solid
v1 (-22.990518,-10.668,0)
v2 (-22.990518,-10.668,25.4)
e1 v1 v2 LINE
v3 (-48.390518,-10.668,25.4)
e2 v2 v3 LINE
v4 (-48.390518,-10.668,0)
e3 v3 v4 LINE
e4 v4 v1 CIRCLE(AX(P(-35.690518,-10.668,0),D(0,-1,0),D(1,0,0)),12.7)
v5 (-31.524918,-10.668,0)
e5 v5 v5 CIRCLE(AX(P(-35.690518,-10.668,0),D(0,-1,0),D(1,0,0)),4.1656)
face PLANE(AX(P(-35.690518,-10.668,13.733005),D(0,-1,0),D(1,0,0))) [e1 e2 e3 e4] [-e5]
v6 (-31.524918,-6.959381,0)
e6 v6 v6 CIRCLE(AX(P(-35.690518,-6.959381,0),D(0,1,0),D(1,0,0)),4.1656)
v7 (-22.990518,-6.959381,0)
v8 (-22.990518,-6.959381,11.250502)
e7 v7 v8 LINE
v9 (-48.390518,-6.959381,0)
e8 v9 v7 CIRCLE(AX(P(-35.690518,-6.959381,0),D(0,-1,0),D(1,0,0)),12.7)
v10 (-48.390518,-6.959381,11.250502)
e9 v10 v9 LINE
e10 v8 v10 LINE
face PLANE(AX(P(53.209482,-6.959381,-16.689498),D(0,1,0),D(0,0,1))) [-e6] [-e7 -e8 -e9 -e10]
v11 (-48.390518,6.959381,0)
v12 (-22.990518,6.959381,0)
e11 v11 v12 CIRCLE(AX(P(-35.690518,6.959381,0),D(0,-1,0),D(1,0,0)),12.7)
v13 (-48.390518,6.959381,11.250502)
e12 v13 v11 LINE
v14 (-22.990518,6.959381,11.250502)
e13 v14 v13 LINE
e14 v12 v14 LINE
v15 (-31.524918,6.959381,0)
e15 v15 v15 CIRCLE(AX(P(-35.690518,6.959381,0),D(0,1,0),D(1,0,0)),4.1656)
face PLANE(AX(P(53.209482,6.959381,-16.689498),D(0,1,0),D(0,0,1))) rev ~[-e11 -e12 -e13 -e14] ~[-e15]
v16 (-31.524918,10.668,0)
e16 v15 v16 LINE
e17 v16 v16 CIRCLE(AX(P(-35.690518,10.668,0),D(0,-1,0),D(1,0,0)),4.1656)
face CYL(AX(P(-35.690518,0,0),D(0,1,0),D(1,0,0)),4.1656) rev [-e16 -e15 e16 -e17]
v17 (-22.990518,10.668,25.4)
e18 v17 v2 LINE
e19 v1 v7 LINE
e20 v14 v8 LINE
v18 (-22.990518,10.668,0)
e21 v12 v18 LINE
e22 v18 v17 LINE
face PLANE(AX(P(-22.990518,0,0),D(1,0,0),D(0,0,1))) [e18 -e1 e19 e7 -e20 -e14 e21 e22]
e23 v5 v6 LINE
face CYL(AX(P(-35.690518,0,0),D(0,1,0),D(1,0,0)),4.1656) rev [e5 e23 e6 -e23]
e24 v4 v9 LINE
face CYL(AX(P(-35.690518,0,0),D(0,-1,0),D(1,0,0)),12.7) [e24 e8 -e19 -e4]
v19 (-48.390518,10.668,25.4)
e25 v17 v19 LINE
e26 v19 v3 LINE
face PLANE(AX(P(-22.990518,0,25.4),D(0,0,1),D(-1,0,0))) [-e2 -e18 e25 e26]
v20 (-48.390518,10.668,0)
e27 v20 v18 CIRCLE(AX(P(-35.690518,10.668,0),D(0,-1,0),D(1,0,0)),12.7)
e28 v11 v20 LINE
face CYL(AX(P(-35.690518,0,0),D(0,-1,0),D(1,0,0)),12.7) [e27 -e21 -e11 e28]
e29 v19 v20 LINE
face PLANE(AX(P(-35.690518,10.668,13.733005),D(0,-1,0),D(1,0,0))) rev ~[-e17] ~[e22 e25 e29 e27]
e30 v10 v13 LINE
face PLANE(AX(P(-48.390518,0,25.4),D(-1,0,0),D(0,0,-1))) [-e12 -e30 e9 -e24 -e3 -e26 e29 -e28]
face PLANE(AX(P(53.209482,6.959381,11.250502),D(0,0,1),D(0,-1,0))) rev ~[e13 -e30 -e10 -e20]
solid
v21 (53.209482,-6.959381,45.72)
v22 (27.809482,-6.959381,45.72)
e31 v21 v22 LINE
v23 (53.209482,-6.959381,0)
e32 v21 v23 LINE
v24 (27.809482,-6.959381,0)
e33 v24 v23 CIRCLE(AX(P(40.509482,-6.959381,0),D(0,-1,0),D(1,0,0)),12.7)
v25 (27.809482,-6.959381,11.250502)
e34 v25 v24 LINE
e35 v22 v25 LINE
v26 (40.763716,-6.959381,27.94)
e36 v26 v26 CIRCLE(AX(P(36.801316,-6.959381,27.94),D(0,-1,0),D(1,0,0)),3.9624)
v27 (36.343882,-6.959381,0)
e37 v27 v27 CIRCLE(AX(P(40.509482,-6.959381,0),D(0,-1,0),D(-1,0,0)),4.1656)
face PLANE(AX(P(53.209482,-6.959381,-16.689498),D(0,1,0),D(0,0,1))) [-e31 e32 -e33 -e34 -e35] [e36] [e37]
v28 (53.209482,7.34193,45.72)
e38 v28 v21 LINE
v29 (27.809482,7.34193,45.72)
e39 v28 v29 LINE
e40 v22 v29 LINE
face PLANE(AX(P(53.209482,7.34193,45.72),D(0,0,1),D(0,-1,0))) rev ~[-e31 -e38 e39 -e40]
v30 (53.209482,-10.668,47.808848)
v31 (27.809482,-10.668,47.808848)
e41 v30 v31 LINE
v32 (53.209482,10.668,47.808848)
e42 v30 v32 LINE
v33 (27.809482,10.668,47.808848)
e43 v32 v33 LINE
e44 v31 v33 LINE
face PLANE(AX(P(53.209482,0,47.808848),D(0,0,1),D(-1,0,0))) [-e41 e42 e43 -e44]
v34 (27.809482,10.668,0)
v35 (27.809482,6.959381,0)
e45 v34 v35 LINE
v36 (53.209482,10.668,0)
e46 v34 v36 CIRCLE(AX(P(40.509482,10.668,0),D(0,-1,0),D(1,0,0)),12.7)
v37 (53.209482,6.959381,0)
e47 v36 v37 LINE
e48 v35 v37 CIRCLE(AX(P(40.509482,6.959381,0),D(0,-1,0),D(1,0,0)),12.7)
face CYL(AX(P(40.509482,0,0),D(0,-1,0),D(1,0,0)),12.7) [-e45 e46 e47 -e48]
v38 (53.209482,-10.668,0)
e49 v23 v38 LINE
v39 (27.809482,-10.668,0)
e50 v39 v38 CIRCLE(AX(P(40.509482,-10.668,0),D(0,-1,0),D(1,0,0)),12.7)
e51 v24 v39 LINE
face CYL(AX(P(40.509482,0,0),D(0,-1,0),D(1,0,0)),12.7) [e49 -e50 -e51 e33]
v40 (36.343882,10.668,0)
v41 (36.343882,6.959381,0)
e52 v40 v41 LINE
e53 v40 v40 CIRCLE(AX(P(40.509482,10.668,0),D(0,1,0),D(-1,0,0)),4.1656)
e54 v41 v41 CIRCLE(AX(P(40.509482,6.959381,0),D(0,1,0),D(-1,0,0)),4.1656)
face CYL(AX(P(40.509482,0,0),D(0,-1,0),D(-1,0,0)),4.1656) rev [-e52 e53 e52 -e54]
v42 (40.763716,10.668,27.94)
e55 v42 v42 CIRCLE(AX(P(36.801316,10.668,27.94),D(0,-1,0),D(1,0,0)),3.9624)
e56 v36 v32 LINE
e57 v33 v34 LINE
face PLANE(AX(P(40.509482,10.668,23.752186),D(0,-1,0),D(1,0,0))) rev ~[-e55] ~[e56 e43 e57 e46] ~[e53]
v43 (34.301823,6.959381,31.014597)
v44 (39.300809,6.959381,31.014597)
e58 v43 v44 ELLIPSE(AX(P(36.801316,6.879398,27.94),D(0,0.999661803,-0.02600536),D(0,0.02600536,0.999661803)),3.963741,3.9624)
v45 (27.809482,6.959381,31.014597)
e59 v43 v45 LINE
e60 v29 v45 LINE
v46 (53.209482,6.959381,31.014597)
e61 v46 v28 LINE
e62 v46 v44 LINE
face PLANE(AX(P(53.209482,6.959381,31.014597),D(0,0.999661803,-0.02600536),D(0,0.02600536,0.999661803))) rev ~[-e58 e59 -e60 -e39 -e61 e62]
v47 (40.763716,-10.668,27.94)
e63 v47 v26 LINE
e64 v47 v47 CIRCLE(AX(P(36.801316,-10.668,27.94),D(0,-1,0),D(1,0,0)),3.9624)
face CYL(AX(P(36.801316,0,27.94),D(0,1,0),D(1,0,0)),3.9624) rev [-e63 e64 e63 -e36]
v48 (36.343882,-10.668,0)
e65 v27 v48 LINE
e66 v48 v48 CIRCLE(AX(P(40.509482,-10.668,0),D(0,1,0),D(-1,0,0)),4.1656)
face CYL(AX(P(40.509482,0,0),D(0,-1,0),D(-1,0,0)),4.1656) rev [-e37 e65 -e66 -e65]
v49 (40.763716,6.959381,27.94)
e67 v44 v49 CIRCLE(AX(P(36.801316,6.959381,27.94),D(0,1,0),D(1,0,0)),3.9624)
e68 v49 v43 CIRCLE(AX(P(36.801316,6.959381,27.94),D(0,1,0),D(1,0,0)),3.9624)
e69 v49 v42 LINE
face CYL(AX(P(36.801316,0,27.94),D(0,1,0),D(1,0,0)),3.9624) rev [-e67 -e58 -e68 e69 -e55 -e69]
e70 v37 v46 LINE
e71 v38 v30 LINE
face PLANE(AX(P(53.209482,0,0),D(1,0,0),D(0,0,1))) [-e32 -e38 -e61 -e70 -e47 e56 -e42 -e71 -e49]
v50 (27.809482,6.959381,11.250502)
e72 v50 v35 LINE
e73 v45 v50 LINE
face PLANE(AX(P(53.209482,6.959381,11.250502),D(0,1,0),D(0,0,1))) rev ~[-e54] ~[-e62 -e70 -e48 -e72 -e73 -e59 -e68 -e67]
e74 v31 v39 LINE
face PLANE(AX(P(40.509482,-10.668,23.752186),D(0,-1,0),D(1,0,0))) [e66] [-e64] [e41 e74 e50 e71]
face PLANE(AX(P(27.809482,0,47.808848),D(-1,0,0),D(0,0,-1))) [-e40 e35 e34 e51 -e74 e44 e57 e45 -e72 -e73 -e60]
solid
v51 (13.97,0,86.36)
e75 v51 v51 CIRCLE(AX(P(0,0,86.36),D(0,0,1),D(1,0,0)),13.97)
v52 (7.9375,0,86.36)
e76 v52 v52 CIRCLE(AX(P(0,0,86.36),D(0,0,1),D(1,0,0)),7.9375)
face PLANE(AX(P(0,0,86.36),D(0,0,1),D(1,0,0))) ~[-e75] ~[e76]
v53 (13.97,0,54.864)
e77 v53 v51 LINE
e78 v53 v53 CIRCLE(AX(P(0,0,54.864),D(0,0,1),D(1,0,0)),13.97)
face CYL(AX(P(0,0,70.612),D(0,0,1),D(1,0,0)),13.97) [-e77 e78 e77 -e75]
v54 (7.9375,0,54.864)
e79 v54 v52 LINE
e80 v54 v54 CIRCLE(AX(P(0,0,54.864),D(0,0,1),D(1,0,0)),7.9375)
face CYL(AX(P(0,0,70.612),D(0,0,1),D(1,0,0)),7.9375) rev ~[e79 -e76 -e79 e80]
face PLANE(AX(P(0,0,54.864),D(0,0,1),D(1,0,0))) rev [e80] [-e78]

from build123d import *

# Parameters (mm, degrees)
F0_W     = 6.0325
F0_H     = 31.496
F0_R     = 4.1656
F2_DEPTH = 10.668
F0_R_2   = 3.9624
F3_W     = 13.9187620953
F3_H     = 16.6894979775
F4_DEPTH = 101.601
F5_DEPTH = 101.601


# Not quite as in the source:
# - the program builds the solid bodies; features that only make, move or delete a surface that nothing else refers to are left out


with BuildPart() as f1:
    # F0 (on Front) → F1 (revolve)
    with BuildSketch(Plane.XZ):
        with Locations((10.95375, 70.612)):
            Rectangle(F0_W, F0_H)
    revolve(axis=Axis((0, 0, 43.18), (0, 0, 1)))


with BuildPart() as f2:
    # F0 (on Front) → F2 (new body, symmetric)
    with BuildSketch(Plane.XZ):
        with BuildLine():
            ThreePointArc((-48.3905182989, 0), (-35.6905182989, 12.7), (-22.9905182989, 0))
            Line((-22.9905182989, 0), (-22.9905182989, 25.4))
            Line((-22.9905182989, 25.4), (-48.3905182989, 25.4))
            Line((-48.3905182989, 25.4), (-48.3905182989, 0))
        make_face()
        with BuildLine():
            ThreePointArc((-48.3905182989, 0), (-35.6905182989, -12.7), (-22.9905182989, 0))
            ThreePointArc((-22.9905182989, 0), (-35.6905182989, 12.7), (-48.3905182989, 0))
        make_face()
        with Locations((-35.6905182989, 0)):
            Circle(F0_R, mode=Mode.SUBTRACT)
    extrude(amount=F2_DEPTH, both=True)


with BuildPart() as f2b:
    # F0 (on Front) → F2, piece 2 (new body, symmetric)
    with BuildSketch(Plane.XZ):
        with BuildLine():
            ThreePointArc((27.8094817011, 0), (40.5094817011, 12.7), (53.2094817011, 0))
            Line((53.2094817011, 0), (53.2094817011, 47.8088483214))
            Line((53.2094817011, 47.8088483214), (27.8094817011, 47.8088483214))
            Line((27.8094817011, 47.8088483214), (27.8094817011, 0))
        make_face()
        with Locations((36.8013158441, 27.94)):
            Circle(F0_R_2, mode=Mode.SUBTRACT)
        with BuildLine():
            ThreePointArc((27.8094817011, 0), (40.5094817011, -12.7), (53.2094817011, 0))
            ThreePointArc((53.2094817011, 0), (40.5094817011, 12.7), (27.8094817011, 0))
        make_face()
        with BuildLine():
            ThreePointArc((44.6750817011, 0), (40.5094817011, -4.1656), (36.3438817011, 0))
            ThreePointArc((36.3438817011, 0), (40.5094817011, 4.1656), (44.6750817011, 0))
        make_face(mode=Mode.SUBTRACT)
    extrude(amount=F2_DEPTH, both=True)


with BuildPart() as f4_tool:
    # F3 (on face) → F4 (new body, through all)
    with BuildSketch(Plane.YZ.offset(53.2094817011)):
        with Locations((0, -8.3447489887)):
            Rectangle(F3_W, F3_H)
        Polygon((-6.9593810476, 0), (6.9593810476, 0), (6.9593810476, 11.2505020225), (-4.3954011053, 11.2505020225), (-6.9593810476, 11.2505020225), align=None)
        Polygon((-6.9593810476, 31.0145973873), (6.9593810476, 31.0145973873), (7.3419297114, 45.72), (-6.9593810476, 45.72), align=None)
    extrude(amount=-F4_DEPTH)


with BuildPart() as f2_1:
    add(f2.part)

    # F4: cut by f4_tool
    add(f4_tool.part, mode=Mode.SUBTRACT)


with BuildPart() as f2b_1:
    add(f2b.part)

    # F4: cut by f4_tool
    add(f4_tool.part, mode=Mode.SUBTRACT)

    # F3 (on face) → F5 (cut, through all)
    with BuildSketch(Plane.YZ.offset(53.2094817011)):
        with Locations((0, -8.3447489887)):
            Rectangle(F3_W, F3_H)
        Polygon((-4.3954011053, 11.2505020225), (6.9593810476, 11.2505020225), (6.9593810476, 31.0145973873), (-6.9593810476, 31.0145973873), (-6.9593810476, 11.2505020225), align=None)
    extrude(amount=-F5_DEPTH, mode=Mode.SUBTRACT)


solid = Compound([f1.part, f2_1.part, f2b_1.part])
